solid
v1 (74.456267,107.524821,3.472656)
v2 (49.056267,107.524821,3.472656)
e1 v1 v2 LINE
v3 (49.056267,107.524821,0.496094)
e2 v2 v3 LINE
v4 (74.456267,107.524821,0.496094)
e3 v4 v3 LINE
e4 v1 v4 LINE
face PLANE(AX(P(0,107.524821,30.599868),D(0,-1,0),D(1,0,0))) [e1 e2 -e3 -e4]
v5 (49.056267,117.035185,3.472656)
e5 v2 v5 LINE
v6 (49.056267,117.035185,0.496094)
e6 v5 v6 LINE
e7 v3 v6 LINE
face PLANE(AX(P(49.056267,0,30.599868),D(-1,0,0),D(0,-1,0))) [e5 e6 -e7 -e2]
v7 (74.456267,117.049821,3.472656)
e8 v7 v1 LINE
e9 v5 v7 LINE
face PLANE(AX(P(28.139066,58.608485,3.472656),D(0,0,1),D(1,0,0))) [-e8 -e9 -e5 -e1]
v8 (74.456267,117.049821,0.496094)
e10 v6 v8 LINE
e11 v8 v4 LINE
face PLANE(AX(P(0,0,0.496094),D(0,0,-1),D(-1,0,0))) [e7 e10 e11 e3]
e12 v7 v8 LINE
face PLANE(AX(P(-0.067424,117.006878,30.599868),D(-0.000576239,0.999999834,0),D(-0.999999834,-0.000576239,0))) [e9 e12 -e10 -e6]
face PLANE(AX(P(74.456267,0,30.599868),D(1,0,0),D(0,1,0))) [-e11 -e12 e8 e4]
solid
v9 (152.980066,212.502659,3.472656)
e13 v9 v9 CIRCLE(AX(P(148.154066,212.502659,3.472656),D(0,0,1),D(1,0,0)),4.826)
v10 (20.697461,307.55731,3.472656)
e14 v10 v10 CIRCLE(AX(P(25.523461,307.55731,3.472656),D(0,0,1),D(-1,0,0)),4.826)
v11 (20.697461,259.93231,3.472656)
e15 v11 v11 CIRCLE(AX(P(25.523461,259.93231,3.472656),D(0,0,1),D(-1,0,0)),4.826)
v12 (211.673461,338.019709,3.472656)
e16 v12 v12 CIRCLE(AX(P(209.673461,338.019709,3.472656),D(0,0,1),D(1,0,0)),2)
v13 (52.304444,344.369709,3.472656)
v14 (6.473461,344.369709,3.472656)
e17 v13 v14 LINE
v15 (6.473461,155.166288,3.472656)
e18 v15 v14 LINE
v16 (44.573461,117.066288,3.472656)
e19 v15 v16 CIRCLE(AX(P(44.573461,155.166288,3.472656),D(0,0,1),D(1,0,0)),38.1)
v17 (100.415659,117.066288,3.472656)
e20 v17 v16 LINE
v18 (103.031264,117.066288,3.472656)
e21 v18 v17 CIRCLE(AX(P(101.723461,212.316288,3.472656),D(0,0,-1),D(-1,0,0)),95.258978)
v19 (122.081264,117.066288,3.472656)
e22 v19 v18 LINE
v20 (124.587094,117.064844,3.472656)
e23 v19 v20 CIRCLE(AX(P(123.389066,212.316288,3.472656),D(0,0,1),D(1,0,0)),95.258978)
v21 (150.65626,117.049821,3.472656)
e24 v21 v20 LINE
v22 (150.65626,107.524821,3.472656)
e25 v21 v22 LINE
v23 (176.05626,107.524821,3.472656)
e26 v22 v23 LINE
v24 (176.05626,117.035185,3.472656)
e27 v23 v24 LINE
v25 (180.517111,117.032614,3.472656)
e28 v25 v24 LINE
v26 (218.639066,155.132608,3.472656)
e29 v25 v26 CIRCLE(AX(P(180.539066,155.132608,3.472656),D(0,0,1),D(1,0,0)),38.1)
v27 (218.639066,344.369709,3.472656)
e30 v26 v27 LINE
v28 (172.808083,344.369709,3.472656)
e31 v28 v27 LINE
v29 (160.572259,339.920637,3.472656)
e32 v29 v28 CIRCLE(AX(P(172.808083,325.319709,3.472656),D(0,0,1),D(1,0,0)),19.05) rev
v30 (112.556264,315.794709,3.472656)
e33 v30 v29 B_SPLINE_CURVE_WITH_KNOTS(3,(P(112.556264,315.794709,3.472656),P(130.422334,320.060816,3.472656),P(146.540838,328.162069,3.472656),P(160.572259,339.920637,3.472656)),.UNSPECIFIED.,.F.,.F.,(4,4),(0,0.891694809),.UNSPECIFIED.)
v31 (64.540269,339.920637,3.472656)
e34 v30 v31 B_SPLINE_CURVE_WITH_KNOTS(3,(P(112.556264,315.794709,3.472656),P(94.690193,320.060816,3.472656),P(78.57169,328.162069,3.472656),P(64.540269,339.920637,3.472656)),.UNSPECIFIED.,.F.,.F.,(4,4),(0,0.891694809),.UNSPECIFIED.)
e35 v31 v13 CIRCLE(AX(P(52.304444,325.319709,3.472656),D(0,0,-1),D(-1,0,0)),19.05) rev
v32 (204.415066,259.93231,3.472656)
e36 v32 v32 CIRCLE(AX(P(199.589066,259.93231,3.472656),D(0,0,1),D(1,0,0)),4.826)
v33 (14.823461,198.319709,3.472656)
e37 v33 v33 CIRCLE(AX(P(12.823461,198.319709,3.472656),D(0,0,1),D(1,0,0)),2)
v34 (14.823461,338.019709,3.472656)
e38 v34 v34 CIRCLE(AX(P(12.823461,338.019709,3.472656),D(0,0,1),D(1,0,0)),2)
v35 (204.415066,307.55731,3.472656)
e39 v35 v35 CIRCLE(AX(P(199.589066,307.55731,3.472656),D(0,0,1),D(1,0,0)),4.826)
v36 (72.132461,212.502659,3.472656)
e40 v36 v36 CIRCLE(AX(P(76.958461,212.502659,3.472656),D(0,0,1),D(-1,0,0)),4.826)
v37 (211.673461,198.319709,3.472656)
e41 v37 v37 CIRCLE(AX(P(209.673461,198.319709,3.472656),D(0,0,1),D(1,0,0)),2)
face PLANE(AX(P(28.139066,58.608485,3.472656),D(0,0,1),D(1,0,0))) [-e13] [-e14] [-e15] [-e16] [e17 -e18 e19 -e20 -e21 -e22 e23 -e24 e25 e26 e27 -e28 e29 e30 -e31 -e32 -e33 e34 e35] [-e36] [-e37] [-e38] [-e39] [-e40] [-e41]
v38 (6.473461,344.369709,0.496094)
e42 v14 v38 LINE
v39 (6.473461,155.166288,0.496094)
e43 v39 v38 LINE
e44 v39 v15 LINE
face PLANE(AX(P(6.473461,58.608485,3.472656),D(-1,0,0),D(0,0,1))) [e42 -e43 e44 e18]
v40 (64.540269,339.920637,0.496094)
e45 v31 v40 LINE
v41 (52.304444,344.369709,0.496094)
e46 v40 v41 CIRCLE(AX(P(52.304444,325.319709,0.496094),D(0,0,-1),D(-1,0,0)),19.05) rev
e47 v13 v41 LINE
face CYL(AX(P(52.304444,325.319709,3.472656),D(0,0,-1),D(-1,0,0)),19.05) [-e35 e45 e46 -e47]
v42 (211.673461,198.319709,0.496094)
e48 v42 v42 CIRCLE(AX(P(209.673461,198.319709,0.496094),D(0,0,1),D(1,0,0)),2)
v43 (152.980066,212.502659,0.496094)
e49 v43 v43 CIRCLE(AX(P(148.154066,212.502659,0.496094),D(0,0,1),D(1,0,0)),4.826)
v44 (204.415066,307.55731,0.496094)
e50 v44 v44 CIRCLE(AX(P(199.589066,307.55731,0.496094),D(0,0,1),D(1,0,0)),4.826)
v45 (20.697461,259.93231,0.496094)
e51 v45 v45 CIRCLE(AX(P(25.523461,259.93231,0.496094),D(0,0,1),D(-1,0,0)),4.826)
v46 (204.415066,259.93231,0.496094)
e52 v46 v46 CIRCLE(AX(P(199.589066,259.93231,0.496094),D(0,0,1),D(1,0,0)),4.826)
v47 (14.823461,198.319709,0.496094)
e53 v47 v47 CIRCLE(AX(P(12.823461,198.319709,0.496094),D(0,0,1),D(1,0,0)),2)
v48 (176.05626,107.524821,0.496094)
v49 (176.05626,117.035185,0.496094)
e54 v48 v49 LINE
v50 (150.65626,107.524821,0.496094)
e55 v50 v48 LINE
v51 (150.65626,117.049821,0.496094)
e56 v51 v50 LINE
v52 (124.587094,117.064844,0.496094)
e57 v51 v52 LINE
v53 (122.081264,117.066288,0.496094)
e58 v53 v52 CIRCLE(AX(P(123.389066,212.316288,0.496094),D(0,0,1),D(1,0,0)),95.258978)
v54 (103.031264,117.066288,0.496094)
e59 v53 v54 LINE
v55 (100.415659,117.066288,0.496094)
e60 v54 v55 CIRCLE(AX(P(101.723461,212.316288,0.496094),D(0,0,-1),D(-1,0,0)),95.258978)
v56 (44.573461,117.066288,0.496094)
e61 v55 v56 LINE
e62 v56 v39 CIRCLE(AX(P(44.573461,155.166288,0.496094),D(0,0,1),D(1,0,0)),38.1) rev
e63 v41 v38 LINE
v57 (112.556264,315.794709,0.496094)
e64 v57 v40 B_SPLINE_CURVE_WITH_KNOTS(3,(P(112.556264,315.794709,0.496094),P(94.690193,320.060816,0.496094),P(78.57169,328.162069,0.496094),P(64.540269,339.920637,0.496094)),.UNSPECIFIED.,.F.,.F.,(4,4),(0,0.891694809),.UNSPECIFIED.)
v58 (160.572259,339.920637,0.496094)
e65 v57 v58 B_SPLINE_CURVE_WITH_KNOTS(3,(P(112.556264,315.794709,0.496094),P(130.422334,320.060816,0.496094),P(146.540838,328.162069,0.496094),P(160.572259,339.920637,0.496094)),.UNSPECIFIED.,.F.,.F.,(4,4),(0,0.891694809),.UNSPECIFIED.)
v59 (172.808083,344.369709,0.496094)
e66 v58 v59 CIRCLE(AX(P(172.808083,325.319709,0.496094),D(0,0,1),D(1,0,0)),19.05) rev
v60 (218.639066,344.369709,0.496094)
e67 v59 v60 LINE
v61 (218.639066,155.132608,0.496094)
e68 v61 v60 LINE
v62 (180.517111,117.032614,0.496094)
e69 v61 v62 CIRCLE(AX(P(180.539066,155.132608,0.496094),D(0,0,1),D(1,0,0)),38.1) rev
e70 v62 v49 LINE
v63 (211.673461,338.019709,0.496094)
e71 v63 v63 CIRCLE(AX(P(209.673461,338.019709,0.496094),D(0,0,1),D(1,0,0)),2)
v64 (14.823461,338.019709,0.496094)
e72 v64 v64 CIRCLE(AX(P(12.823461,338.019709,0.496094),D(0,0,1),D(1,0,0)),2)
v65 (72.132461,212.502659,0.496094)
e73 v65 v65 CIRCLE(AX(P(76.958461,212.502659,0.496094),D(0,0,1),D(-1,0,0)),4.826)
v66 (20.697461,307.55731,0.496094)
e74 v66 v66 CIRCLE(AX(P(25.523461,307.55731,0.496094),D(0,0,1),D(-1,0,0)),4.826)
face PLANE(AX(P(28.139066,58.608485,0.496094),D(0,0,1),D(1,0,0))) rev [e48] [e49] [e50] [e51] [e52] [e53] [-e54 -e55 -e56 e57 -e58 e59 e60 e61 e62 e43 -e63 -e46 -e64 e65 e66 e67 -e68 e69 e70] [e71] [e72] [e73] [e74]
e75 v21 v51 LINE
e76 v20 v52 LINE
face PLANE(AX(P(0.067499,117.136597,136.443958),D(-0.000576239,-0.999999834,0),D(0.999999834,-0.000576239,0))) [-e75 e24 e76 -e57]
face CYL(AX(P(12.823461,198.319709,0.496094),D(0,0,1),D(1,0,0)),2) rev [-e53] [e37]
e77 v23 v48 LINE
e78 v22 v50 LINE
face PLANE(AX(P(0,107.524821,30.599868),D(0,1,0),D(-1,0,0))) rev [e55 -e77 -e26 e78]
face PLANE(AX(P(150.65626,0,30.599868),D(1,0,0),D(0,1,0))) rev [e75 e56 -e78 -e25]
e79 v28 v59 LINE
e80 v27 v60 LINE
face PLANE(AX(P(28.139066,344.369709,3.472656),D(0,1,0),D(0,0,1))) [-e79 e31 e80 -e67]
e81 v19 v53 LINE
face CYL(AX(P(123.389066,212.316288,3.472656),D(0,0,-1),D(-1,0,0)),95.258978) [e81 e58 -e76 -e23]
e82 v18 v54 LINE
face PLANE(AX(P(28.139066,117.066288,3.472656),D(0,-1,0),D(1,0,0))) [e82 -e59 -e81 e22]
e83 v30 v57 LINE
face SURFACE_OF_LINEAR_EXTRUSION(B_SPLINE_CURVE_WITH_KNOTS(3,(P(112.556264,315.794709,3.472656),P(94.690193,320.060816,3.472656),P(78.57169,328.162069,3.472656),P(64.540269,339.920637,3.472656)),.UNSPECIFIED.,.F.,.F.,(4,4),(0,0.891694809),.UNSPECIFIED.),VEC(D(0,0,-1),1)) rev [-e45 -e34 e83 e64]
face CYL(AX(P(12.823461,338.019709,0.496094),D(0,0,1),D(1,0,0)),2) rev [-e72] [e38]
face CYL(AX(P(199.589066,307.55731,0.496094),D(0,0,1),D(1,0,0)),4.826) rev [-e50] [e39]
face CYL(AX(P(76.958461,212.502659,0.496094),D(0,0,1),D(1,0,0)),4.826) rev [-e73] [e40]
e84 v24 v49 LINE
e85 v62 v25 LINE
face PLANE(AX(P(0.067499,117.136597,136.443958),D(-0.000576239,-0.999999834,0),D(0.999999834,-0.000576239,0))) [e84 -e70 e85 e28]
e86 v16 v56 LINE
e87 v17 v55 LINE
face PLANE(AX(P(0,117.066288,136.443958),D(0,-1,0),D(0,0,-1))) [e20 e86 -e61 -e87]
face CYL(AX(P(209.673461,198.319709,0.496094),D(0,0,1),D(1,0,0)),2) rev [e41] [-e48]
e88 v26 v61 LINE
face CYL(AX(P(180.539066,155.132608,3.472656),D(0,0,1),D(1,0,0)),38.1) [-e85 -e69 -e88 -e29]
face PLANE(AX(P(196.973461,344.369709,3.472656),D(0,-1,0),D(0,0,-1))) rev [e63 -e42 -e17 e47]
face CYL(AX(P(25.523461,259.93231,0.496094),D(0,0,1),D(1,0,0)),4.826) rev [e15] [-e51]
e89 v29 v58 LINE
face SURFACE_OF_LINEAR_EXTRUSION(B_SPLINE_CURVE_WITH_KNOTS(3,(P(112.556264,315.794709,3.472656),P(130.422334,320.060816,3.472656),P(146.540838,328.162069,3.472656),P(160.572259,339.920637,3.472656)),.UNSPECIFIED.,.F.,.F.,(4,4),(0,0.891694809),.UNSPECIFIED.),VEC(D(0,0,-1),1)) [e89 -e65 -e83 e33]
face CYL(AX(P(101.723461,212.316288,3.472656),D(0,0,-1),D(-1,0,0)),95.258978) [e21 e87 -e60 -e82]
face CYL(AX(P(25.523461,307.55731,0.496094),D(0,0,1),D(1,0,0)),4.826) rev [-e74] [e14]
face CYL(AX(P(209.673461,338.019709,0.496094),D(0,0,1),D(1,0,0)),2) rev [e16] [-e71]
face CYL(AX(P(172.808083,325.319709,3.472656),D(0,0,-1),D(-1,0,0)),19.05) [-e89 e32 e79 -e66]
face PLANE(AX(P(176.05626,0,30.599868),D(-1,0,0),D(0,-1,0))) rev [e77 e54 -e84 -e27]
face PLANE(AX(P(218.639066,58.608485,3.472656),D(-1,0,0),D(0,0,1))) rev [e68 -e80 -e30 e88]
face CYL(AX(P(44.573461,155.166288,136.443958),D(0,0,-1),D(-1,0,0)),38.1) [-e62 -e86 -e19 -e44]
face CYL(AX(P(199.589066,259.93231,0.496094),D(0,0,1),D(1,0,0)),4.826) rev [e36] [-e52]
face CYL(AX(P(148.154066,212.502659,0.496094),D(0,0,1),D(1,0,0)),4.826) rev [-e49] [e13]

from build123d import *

# Parameters (mm, degrees)
BOSS_EXTRUDE1_DEPTH = 3.96875
SKETCH2_R           = 6.434666667
CUT_EXTRUDE1_DEPTH  = 458.934661801
SCALE1_SCALE        = 0.75
SKETCH3_R           = 2
CUT_EXTRUDE2_DEPTH  = 408.924502354
BOSS_EXTRUDE2_START = -2.9765625
BOSS_EXTRUDE2_DEPTH = 2.9765625
BOSS_EXTRUDE3_DEPTH = 2.9765625
FILLET1_R           = 38.1


# Read off the part's stored shape, not the designer's step: Boss-Extrude2
with BuildPart() as part:
    # Sketch1 → Boss-Extrude1 (new body)
    with BuildSketch(Plane.XY):
        with BuildLine():
            ThreePointArc((125.256263701, 77.943736299), (215.569553449, 113.908167327), (254, 203.2))
            Line((254, 203.2), (254, 304.814964765))
            Line((254, 304.814964765), (254, 381.014964765))
            Line((254, 381.014964765), (192.892022849, 381.014964765))
            ThreePointArc((192.892022849, 381.014964765), (184.21229846, 379.485917501), (176.577590515, 375.082869059))
            add(Edge.make_bspline(
                [(112.556263701, 342.914964765), (136.377690637, 348.603107697), (157.869028788, 359.404778612), (176.577590515, 375.082869059)],
                knots=[0, 0, 0, 0, 0.891694809, 0.891694809, 0.891694809, 0.891694809], degree=3))
            Line((112.556263701, 342.914964765), (112.556263701, 304.814964765))
            Line((112.556263701, 304.814964765), (112.556263701, 77.943736299))
            Line((112.556263701, 77.943736299), (125.256263701, 77.943736299))
        make_face()
    boss_extrude1 = extrude(amount=BOSS_EXTRUDE1_DEPTH)

    # Mirror1: Boss-Extrude1 across plane
    add(boss_extrude1.mirror(Plane(origin=(112.556263701, 0, 3.96875), x_dir=(0, 0, 1), z_dir=(-1, 0, 0))))

    # Sketch2 → Cut-Extrude1 (cut, through all)
    with BuildSketch(Plane.XY.offset(3.96875)):
        with Locations((228.6, 331.931765933)):
            Circle(SKETCH2_R)
        with Locations((228.6, 268.431765933)):
            Circle(SKETCH2_R)
        with Locations((160.02, 205.192231498)):
            Circle(SKETCH2_R)
        with Locations(Location((65.092527401, 205.192231498, 0), (0, 0, 180))):
            Circle(SKETCH2_R)
        with Locations(Location((-3.487472599, 268.431765933, 0), (0, 0, 180))):
            Circle(SKETCH2_R)
        with Locations(Location((-3.487472599, 331.931765933, 0), (0, 0, 180))):
            Circle(SKETCH2_R)
    extrude(amount=-CUT_EXTRUDE1_DEPTH, mode=Mode.SUBTRACT)


with BuildPart() as part_1:
    # Scale1: scaled about (112.556263701, 234.433953078, 1.984375)
    add(part.part.scale(SCALE1_SCALE).moved(Location((28.139065925, 58.60848827, 0.49609375))))

    # Sketch3 → Cut-Extrude2 (cut, through all)
    with BuildSketch(Plane.XY.offset(3.47265625)):
        with Locations((12.823461476, 338.01970885)):
            Circle(SKETCH3_R)
        with Locations((209.673461476, 338.01970885)):
            Circle(SKETCH3_R)
        with Locations((209.673461476, 198.31970885)):
            Circle(SKETCH3_R)
        with Locations((12.823461476, 198.31970885)):
            Circle(SKETCH3_R)
    extrude(amount=-CUT_EXTRUDE2_DEPTH, mode=Mode.SUBTRACT)


with BuildPart() as boss_extrude2_tool:
    # Boss-Extrude2 outline → Boss-Extrude2 (new body)
    with BuildSketch(Plane(origin=(0, 0, 0.49609375), x_dir=(-1, 0, 0), z_dir=(0, 0, -1)).offset(BOSS_EXTRUDE2_START)):
        with BuildLine():
            ThreePointArc((-6.473461476, 211.008485276), (-34.365192323, 144.958018347), (-100.415659252, 117.066287501))
            Line((-100.415659252, 117.066287501), (-6.473461476, 117.066287501))
            Line((-6.473461476, 117.066287501), (-6.473461476, 211.008485276))
        make_face()
        with BuildLine():
            Line((-218.639065925, 211.008485276), (-218.639065925, 117.01064714))
            Line((-218.639065925, 117.01064714), (-124.58709381, 117.064843544))
            ThreePointArc((-124.58709381, 117.064843544), (-190.708509448, 144.919215083), (-218.639065925, 211.008485276))
        make_face()
    extrude(amount=BOSS_EXTRUDE2_DEPTH)


with BuildPart() as part_2:
    add(part_1.part)


with BuildPart() as part_3:
    # Boss-Extrude2: joined with boss_extrude2_tool
    add(part_2.part.fuse(boss_extrude2_tool.part, tol=0.00001))

    # Sketch5 → Boss-Extrude3 (add)
    with BuildSketch(Plane(origin=(0, 0, 0.49609375), x_dir=(-1, 0, 0), z_dir=(0, 0, -1))):
        Polygon((-150.656260143, 107.524821477), (-150.656260143, 117.049821477), (-176.056260143, 117.035185009), (-176.056260143, 107.524821477), align=None)
        Polygon((-49.056267259, 117.035185009), (-74.456267259, 117.049821477), (-74.456267259, 107.524821477), (-49.056267259, 107.524821477), align=None)
    extrude(amount=-BOSS_EXTRUDE3_DEPTH)


with BuildPart() as boss_extrude3_piece_1:
    # of the separate pieces the step leaves, piece 1, a body of its own (boss_extrude3_pieces)
    add(part_3.part.solids().sort_by_distance((122.081263701, 117.066290494, 0.49609375))[0])

    # Fillet1
    fillet1_edges = [boss_extrude3_piece_1.edges().sort_by_distance(p)[0] for p in [
        (218.639065925, 117.01064714, 1.984375),
        (6.473461476, 117.066287501, 1.984375),
    ]]
    fillet(fillet1_edges, radius=FILLET1_R)


with BuildPart() as boss_extrude3_piece_2:
    # of the separate pieces the step leaves, piece 2, a body of its own (boss_extrude3_pieces)
    add(part_3.part.solids().sort_by_distance((49.056267259, 117.035185009, 0.49609375))[0])


solid = Compound([boss_extrude3_piece_1.part, boss_extrude3_piece_2.part])
